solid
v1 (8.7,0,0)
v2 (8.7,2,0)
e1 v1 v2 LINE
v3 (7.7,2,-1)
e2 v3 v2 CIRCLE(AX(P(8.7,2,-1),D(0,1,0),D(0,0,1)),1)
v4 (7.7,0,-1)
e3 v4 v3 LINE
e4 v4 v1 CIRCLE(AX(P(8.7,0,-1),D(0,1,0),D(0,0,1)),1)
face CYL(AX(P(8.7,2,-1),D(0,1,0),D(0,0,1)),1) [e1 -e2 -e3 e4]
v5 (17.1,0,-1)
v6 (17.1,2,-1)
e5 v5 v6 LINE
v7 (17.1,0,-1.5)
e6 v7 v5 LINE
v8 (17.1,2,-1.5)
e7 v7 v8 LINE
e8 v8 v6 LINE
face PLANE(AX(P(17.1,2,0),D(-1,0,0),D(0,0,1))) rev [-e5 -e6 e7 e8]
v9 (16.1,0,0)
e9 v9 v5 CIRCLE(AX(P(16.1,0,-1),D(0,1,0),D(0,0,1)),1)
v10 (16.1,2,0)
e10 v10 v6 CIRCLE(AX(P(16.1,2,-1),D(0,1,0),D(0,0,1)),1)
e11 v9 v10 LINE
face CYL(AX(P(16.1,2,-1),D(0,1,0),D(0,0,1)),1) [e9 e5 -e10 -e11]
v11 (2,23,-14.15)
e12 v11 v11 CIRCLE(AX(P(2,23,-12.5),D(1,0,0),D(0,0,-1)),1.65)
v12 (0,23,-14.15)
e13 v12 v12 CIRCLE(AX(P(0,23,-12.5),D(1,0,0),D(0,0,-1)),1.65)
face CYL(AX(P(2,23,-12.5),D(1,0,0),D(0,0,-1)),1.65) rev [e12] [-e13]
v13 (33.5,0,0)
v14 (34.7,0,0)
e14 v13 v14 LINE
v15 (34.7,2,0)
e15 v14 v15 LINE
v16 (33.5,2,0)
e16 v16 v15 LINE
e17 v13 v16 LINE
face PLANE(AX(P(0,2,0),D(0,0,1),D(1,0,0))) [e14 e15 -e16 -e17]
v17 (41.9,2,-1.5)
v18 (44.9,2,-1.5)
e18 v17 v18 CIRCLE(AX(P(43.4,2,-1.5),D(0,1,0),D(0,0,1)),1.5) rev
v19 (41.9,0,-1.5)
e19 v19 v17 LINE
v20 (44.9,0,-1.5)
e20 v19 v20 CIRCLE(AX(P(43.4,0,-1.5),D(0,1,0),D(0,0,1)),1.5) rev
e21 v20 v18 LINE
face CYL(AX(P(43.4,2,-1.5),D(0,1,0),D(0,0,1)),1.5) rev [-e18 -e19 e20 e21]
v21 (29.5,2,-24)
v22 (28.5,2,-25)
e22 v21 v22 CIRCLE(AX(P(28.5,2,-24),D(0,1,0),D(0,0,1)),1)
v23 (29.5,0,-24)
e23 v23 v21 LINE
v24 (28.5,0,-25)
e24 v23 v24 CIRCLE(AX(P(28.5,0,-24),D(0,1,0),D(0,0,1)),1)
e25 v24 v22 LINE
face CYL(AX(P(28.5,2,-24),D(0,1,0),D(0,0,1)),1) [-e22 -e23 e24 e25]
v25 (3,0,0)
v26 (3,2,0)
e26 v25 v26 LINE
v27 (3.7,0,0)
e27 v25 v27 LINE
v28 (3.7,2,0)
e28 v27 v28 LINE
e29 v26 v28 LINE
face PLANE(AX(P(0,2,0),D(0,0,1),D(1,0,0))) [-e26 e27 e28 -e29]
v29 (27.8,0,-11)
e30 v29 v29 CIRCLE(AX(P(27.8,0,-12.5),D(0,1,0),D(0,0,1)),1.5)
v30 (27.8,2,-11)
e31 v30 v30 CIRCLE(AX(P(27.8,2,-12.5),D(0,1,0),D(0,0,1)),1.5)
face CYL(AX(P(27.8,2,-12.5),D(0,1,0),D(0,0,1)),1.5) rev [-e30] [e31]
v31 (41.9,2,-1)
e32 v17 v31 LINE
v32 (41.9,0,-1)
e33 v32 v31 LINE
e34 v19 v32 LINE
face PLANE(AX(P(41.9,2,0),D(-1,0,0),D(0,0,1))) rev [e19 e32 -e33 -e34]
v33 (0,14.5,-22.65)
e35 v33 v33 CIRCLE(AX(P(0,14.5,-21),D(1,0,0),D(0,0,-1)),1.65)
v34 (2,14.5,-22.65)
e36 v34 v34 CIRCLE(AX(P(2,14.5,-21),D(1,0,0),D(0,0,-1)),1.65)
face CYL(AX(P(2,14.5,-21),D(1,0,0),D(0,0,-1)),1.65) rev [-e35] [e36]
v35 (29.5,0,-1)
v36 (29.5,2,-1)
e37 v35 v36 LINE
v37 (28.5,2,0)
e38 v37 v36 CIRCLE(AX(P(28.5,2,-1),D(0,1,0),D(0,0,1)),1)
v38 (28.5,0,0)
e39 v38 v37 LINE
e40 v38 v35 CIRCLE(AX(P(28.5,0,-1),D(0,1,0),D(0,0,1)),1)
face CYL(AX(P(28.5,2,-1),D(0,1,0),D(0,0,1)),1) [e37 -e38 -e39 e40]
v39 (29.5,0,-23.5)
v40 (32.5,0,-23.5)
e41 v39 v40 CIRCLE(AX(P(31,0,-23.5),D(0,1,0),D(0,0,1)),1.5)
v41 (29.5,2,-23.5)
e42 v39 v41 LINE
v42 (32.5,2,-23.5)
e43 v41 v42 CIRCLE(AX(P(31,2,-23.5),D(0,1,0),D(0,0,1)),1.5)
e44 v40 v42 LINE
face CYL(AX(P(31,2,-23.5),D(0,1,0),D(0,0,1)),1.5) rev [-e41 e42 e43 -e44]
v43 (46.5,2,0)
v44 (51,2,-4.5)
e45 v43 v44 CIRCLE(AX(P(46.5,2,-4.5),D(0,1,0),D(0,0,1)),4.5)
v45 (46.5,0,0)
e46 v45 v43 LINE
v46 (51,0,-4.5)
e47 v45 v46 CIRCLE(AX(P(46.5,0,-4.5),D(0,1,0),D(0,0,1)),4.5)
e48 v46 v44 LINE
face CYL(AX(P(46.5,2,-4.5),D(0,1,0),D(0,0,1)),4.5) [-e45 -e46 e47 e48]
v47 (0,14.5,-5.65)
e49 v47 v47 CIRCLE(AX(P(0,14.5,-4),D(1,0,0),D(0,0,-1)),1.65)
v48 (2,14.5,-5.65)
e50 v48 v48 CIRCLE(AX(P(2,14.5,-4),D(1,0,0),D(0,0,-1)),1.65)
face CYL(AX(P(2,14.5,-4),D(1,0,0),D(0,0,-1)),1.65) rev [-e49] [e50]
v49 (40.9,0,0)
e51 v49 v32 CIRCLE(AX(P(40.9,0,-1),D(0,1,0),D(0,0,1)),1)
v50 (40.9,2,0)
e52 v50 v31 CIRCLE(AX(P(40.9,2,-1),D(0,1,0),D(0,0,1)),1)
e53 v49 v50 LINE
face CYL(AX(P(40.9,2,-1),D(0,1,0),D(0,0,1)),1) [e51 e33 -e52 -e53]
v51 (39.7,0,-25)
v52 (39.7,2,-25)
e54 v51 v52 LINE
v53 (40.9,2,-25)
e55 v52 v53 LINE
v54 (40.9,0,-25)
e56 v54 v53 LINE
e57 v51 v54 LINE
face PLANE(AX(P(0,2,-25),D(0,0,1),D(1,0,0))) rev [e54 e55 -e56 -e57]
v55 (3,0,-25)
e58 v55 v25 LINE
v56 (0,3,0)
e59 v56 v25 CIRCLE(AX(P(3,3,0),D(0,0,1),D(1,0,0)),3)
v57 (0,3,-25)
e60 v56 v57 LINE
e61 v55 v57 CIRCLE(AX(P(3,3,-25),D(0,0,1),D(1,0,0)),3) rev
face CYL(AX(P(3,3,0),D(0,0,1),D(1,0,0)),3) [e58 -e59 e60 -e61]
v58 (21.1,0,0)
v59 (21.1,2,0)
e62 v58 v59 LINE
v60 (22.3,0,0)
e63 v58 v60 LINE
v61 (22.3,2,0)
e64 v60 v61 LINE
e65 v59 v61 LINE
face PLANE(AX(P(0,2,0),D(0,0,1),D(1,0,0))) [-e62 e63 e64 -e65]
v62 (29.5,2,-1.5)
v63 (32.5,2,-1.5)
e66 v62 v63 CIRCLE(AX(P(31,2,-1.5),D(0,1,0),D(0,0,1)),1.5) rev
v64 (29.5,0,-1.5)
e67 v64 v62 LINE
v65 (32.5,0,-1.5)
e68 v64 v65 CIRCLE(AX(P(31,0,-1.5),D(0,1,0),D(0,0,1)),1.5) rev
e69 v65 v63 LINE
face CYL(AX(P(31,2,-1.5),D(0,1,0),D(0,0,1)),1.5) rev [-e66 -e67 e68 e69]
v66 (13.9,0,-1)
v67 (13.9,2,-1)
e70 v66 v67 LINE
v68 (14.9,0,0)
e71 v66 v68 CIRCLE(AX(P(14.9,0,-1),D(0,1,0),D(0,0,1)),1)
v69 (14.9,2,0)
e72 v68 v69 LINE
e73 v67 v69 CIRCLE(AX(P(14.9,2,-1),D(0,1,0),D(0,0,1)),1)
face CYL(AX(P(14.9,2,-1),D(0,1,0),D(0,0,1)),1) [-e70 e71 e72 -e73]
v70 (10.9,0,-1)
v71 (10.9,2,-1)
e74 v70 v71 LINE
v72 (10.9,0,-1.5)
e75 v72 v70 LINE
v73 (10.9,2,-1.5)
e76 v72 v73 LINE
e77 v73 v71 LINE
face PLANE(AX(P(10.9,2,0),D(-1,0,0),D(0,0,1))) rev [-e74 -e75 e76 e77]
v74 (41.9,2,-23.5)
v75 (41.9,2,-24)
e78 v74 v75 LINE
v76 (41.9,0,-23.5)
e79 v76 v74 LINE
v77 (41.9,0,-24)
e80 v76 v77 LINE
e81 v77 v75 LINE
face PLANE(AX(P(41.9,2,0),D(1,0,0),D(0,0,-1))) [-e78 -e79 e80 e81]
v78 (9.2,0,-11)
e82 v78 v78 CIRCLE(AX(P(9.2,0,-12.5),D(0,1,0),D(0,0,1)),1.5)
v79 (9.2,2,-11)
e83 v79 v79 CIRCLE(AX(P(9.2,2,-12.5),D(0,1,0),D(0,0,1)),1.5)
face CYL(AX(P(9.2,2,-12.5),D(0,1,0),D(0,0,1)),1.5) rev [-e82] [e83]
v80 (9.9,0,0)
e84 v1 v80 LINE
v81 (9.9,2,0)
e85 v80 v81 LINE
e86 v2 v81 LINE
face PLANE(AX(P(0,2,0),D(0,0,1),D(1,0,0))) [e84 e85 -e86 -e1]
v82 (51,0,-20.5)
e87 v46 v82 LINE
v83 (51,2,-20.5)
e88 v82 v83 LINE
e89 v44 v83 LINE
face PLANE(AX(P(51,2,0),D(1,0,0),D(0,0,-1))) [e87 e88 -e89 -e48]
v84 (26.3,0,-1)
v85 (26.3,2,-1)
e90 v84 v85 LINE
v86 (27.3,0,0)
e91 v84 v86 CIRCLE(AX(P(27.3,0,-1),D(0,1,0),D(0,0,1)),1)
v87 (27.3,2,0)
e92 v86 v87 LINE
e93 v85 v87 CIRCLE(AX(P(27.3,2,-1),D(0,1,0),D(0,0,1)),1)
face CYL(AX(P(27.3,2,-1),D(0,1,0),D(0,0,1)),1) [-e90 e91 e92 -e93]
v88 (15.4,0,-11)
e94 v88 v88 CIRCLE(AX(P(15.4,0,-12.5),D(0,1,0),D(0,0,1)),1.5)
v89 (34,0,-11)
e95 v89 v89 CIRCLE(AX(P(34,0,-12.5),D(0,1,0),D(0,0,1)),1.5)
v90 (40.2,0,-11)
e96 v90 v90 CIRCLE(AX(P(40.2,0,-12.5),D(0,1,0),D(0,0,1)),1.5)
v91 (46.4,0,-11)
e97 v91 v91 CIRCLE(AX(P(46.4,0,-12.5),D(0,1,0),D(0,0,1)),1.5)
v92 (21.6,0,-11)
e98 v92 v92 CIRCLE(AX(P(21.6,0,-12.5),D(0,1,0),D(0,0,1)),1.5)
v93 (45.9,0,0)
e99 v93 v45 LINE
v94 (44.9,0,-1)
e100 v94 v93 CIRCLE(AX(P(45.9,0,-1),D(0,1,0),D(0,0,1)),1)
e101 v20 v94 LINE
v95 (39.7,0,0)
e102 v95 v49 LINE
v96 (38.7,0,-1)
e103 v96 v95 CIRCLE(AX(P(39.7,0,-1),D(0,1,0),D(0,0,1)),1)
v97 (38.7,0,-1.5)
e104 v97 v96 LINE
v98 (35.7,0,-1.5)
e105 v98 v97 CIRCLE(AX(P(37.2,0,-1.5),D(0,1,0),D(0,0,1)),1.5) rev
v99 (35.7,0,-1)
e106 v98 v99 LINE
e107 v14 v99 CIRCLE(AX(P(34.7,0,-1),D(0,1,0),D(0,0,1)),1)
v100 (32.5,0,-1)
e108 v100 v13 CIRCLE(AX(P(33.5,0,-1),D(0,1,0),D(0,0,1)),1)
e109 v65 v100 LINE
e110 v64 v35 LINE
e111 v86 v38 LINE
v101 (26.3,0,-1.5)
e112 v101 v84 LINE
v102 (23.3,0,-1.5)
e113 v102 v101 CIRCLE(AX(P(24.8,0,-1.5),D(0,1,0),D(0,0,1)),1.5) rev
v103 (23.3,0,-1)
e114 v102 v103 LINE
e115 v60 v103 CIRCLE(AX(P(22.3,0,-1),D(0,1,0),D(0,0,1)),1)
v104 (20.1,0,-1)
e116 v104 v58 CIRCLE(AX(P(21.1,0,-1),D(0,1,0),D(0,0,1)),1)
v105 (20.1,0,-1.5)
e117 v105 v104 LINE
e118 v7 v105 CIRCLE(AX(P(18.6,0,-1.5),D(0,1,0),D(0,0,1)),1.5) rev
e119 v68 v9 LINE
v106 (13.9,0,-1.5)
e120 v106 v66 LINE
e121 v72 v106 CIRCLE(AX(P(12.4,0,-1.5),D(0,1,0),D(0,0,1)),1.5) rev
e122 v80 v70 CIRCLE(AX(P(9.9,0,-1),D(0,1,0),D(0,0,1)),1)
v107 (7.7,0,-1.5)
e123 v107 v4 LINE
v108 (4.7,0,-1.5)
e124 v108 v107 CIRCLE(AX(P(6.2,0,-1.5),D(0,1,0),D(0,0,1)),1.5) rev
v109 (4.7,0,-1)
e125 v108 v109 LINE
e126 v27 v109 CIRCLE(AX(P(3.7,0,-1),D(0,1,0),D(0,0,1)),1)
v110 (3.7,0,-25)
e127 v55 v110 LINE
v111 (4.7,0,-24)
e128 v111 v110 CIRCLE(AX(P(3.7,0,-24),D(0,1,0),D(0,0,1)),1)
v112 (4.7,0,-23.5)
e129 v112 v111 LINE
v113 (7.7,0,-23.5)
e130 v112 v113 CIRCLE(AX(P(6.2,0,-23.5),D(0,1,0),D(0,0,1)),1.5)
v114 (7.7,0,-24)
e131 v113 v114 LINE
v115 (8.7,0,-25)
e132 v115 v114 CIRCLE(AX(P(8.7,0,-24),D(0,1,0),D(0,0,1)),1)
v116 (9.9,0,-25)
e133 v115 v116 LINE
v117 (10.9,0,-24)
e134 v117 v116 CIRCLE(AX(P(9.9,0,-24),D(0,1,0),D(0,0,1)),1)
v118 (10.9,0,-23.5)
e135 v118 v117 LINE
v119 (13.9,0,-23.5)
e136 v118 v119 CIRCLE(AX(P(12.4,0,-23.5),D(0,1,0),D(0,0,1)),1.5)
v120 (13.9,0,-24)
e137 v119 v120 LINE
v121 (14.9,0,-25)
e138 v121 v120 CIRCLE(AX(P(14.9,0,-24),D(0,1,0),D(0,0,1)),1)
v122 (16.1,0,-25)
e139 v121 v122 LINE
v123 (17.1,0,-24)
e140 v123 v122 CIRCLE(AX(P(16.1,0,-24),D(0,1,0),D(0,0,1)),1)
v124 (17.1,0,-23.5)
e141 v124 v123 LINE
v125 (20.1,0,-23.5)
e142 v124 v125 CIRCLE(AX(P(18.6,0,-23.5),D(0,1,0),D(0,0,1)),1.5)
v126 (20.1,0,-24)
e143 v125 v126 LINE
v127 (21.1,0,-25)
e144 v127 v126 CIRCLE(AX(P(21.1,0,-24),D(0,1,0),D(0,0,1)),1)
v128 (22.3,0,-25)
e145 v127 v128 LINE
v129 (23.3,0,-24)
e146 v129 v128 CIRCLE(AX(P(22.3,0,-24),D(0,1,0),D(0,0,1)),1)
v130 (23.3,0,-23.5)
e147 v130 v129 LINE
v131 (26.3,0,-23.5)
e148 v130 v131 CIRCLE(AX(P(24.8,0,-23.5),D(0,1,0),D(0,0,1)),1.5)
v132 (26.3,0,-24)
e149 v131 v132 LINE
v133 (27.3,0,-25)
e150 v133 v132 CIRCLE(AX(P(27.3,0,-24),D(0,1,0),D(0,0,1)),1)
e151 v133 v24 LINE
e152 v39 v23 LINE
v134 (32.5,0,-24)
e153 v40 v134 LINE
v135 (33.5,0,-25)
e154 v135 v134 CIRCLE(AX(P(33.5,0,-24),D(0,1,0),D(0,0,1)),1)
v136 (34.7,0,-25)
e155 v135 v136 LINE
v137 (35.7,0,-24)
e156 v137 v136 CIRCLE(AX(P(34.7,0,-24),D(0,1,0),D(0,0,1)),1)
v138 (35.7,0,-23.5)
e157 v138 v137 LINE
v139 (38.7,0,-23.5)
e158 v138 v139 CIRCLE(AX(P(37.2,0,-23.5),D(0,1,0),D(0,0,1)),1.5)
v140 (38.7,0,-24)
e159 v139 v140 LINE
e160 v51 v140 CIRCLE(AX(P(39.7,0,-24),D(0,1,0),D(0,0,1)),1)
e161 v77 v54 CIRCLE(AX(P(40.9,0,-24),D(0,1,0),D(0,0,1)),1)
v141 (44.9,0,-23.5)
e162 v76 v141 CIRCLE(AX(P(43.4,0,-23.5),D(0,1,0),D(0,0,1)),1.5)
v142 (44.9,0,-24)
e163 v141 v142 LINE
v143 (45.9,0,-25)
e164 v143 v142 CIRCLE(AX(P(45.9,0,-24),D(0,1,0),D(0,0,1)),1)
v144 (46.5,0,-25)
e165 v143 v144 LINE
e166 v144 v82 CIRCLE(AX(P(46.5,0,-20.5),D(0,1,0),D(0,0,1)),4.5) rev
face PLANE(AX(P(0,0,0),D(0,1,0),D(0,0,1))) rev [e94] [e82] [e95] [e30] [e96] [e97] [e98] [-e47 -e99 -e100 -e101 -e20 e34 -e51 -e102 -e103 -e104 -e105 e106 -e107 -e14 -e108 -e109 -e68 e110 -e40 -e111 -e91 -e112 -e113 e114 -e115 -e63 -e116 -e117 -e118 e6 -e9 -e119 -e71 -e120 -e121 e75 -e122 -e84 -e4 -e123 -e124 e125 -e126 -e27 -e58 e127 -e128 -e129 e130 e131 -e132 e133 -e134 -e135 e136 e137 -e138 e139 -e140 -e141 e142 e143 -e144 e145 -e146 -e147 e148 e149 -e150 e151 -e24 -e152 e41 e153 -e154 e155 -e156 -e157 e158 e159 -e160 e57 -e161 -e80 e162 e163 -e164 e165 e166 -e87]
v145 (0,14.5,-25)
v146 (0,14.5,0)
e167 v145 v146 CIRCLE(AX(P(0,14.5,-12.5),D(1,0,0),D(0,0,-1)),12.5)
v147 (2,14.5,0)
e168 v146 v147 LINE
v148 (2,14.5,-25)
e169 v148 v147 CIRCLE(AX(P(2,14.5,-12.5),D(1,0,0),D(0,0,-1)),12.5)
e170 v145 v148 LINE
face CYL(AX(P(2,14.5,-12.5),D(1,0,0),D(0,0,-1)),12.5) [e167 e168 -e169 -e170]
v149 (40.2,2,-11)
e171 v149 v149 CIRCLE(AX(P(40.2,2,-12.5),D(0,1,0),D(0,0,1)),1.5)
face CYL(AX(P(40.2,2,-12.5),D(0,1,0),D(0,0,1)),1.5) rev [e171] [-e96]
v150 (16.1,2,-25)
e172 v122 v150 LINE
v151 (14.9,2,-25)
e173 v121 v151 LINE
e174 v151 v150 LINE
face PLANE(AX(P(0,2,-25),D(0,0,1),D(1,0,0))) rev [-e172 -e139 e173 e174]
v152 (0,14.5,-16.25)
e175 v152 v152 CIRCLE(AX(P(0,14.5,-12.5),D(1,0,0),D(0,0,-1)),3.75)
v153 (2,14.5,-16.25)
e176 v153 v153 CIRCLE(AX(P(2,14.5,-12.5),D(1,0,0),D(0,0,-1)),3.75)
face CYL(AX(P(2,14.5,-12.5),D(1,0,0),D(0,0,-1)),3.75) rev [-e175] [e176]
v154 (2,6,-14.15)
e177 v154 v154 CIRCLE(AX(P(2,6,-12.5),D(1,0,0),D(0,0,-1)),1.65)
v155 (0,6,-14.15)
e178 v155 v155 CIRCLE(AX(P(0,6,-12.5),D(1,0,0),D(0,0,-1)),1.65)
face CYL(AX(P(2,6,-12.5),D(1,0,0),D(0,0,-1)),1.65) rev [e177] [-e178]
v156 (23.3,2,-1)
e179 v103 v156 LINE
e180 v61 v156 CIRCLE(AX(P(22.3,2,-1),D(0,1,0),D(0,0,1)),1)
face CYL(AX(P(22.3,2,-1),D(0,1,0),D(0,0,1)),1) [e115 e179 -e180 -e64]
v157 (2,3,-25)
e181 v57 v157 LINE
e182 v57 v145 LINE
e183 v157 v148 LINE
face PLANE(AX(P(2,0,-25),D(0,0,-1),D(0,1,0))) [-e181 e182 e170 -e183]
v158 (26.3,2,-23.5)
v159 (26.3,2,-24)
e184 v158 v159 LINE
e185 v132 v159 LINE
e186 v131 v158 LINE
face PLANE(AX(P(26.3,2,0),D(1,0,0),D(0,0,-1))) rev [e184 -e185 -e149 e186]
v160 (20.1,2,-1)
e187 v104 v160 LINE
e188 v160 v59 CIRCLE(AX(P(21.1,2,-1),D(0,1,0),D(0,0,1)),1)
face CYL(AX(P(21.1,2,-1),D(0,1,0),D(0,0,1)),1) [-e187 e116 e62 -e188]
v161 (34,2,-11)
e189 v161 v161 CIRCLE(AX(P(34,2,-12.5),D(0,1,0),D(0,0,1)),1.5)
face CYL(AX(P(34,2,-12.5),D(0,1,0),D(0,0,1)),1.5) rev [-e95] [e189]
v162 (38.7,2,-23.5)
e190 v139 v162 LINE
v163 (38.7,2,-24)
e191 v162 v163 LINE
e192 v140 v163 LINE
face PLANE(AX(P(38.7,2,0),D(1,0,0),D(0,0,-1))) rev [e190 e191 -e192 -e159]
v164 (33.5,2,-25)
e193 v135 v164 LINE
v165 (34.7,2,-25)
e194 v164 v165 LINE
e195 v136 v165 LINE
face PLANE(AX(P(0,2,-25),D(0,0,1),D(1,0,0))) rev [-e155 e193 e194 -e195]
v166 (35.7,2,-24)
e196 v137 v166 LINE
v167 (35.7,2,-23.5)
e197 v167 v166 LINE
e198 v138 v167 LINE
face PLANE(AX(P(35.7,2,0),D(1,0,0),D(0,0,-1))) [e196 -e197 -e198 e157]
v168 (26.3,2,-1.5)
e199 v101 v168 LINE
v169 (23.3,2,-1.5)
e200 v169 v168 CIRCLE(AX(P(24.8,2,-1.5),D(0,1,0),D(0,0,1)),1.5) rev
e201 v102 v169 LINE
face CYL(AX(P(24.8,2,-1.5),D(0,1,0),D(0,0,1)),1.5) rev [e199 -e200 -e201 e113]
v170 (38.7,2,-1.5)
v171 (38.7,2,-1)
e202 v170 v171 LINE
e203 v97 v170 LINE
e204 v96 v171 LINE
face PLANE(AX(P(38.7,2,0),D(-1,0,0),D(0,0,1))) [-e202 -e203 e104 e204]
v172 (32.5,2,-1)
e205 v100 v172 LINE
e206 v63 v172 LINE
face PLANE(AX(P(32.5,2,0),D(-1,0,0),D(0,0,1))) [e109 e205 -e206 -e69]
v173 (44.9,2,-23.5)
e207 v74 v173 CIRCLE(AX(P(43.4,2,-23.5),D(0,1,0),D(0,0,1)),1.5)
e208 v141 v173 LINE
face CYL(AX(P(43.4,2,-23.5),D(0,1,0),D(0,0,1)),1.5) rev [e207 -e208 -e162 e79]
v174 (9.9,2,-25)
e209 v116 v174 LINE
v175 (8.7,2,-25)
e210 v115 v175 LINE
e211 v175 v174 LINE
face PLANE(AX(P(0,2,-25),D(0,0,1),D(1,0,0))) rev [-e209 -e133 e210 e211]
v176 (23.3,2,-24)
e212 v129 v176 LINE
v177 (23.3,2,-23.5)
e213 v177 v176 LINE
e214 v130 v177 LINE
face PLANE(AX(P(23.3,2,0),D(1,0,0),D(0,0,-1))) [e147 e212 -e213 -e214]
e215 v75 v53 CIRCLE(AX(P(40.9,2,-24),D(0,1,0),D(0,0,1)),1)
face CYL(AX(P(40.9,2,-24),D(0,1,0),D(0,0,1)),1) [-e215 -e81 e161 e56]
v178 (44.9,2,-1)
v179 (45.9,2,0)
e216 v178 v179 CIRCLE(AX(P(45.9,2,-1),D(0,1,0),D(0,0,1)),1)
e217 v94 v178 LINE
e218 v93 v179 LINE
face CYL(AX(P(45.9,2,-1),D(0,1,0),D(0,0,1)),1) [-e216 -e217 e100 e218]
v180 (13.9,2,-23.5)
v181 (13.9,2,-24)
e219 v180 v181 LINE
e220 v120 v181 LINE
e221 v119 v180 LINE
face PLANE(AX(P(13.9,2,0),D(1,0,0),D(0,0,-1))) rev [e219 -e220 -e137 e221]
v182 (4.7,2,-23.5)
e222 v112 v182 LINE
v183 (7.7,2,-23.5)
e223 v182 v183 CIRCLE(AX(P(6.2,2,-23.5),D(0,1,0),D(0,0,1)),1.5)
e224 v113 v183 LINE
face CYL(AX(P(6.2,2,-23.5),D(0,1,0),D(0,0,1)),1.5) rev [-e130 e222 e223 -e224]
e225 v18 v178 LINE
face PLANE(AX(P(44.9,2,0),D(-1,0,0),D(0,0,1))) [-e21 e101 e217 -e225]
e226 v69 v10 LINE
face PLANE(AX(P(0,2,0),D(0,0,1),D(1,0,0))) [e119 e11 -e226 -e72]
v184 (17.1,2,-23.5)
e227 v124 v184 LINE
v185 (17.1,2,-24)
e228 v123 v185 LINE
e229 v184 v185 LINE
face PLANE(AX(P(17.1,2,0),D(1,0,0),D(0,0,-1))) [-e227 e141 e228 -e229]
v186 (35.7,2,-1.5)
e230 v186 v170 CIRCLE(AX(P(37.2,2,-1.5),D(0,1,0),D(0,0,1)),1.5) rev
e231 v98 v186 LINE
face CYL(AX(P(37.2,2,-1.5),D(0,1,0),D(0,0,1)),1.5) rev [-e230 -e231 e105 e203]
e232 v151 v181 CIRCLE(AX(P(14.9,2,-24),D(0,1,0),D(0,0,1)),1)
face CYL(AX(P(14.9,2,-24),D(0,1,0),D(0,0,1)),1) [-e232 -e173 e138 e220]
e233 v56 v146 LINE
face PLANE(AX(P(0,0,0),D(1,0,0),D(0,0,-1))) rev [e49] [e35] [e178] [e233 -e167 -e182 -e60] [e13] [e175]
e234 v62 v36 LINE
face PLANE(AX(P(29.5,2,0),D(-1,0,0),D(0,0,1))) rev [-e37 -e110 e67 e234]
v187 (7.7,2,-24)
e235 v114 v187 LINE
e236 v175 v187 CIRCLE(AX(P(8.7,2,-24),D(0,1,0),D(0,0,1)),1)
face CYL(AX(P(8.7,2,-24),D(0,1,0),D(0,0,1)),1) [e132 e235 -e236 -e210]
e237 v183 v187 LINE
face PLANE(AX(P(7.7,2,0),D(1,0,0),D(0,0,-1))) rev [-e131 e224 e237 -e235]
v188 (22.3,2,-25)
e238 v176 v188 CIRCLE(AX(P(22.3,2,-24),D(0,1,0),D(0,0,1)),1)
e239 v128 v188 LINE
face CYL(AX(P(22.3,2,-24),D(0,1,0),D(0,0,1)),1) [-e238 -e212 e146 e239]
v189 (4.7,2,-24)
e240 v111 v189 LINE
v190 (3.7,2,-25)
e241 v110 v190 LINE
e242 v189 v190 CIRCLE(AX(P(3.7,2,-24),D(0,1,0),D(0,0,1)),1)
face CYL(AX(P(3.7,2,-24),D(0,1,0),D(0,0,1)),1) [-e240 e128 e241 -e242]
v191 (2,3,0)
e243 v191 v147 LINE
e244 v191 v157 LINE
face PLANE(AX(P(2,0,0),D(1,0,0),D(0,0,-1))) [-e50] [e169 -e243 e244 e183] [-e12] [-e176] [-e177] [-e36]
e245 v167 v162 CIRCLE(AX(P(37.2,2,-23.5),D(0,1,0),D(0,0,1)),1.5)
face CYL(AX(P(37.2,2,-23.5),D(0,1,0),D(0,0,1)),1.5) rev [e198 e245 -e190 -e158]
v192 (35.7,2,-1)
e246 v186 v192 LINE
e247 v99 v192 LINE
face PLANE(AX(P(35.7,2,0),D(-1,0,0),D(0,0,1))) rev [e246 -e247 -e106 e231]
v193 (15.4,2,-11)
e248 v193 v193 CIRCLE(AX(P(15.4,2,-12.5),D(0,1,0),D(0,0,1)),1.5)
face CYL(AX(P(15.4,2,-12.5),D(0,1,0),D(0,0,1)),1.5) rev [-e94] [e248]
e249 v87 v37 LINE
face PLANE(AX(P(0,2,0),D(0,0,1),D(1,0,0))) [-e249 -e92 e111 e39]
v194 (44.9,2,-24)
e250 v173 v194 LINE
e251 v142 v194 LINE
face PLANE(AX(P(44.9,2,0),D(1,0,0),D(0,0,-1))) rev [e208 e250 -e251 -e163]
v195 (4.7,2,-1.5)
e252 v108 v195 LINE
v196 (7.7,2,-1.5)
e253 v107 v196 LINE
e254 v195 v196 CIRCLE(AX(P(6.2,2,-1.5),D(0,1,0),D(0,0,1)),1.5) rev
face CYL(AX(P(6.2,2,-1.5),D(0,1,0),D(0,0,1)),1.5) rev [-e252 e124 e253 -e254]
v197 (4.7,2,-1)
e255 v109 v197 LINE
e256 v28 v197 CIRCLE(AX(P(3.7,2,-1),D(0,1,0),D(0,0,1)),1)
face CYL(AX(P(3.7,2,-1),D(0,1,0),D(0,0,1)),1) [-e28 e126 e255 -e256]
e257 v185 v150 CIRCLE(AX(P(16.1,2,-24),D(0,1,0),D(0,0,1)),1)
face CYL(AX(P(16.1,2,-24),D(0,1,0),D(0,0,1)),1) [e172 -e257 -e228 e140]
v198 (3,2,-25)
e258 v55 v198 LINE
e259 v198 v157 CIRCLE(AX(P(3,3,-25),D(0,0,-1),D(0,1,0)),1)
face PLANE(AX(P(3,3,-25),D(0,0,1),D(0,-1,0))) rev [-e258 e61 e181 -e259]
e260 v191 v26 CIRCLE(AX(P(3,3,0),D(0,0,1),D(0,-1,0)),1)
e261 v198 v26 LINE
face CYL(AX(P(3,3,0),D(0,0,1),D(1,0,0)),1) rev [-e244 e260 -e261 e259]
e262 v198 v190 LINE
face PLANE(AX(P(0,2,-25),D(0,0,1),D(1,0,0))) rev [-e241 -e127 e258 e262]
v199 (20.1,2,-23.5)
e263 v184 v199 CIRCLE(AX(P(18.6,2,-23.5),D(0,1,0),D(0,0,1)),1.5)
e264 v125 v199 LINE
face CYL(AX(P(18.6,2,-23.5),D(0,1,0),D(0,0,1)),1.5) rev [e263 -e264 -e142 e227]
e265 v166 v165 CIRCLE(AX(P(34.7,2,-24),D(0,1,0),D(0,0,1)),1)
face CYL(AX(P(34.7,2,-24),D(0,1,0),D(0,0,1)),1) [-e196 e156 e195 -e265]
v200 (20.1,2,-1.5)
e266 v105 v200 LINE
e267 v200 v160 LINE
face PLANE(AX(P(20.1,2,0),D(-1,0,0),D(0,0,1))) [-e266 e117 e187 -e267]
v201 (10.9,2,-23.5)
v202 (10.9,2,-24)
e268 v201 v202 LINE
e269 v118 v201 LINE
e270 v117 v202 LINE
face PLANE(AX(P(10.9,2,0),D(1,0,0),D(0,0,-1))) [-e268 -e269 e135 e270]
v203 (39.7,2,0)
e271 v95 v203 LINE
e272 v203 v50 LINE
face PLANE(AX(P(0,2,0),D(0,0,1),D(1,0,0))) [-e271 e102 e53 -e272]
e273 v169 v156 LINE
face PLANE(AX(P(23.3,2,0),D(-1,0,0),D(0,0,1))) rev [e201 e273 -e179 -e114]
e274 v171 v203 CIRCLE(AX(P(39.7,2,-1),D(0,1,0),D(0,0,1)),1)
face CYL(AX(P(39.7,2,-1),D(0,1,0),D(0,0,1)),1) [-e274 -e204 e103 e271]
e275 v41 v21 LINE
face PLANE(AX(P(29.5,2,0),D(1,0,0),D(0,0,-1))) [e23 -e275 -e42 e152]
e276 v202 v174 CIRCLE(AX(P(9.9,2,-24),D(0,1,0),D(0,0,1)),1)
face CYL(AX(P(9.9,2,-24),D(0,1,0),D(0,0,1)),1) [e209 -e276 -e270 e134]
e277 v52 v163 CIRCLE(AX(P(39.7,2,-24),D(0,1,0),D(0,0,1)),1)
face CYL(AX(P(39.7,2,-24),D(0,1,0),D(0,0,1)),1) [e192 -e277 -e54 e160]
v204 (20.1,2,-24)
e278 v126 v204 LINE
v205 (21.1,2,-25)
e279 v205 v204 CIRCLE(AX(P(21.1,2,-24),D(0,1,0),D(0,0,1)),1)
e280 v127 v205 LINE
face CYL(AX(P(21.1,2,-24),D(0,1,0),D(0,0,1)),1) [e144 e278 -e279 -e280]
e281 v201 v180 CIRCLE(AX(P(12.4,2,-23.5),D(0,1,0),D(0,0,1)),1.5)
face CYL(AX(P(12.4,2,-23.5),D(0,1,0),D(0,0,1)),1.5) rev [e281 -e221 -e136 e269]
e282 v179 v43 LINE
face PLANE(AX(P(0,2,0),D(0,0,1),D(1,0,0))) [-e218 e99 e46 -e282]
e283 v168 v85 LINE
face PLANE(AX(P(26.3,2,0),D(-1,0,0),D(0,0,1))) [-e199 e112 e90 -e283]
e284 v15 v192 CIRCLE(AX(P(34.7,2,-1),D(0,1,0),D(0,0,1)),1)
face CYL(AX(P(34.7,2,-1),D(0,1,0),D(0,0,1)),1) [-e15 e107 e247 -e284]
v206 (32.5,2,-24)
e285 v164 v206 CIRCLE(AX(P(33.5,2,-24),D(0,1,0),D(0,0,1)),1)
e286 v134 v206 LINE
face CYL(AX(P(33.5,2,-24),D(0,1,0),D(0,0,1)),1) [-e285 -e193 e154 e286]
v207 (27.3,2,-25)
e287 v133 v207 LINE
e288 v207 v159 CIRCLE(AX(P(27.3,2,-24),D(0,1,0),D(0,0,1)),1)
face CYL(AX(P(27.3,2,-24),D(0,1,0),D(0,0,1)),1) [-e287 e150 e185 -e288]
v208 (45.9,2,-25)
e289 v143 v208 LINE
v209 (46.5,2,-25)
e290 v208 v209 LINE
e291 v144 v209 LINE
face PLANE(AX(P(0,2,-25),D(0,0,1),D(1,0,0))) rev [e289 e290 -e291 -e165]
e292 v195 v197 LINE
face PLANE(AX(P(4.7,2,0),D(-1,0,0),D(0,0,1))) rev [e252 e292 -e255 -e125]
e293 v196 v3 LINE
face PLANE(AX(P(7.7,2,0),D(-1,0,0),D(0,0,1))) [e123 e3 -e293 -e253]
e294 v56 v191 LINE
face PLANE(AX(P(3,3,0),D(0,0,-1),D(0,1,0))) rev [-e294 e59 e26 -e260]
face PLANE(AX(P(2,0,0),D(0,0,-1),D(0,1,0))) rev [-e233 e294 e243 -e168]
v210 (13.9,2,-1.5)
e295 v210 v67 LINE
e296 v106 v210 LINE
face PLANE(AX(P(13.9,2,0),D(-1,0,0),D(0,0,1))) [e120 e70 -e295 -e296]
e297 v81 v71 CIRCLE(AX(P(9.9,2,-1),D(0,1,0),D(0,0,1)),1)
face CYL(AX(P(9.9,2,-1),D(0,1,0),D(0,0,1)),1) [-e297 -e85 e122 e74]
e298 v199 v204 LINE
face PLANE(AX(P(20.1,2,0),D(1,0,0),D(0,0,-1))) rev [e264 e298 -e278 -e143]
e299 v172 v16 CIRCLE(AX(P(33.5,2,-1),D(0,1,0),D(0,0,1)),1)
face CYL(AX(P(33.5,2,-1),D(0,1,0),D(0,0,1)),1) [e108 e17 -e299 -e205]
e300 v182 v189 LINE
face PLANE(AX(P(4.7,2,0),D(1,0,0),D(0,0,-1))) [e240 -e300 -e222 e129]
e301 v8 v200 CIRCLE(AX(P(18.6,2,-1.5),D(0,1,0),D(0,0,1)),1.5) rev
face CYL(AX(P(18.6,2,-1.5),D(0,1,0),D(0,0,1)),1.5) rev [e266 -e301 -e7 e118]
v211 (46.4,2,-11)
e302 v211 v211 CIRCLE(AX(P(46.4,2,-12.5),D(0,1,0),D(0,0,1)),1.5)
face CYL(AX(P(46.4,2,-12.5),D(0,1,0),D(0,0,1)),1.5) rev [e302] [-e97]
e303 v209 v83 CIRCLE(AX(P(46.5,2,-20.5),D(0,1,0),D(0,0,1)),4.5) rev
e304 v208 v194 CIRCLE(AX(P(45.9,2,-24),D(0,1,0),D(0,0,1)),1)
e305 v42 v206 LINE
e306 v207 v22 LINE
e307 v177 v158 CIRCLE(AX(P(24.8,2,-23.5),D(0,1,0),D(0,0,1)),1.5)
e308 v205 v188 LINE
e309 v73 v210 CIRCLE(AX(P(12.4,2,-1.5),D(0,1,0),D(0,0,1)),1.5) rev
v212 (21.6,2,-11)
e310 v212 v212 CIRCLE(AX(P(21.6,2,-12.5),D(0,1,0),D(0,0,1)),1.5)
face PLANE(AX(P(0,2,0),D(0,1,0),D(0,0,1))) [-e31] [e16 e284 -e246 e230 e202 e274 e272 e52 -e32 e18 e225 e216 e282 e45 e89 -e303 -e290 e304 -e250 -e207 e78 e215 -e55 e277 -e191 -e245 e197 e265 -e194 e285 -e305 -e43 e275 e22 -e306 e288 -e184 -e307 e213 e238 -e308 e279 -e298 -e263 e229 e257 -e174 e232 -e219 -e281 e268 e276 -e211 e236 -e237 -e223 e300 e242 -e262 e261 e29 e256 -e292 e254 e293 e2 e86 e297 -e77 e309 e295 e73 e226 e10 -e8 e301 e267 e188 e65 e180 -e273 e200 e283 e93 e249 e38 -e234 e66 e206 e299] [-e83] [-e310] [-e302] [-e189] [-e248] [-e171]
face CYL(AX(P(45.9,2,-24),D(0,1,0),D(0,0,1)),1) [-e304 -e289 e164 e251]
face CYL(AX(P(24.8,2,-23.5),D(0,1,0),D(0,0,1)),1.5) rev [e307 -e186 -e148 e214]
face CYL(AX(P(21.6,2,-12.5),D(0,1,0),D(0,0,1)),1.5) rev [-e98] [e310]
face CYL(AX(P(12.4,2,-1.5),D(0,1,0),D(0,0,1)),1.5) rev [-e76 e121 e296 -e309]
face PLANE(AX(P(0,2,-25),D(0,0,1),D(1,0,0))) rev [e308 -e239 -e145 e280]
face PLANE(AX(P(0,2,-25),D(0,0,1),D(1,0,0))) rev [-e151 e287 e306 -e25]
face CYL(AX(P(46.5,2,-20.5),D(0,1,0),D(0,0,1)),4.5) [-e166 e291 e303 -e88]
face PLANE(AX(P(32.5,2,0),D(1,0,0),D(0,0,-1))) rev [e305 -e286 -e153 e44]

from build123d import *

# Parameters (mm, degrees)
BOSS_EXTRUDE1_DEPTH    = 2
FILLET1_R              = 1
SKETCH2_R              = 1.65
BOSS_EXTRUDE2_DEPTH    = 2
CONVERT_SOLID1_START   = -25
CONVERT_SOLID1_DEPTH   = 25
CONVERT_SOLID1_2_DEPTH = 25


# Read off the part's stored shape, not the designer's step: Convert-Solid1
with BuildPart() as part:
    # Sketch1 → Boss-Extrude1 (new body)
    with BuildSketch(Plane(origin=(0, 0, 0), x_dir=(1, 0, 0), z_dir=(0, 1, 0))):
        with BuildLine():
            Line((51, 12.5), (47.9, 12.5))
            ThreePointArc((47.9, 12.5), (46.4, 11), (44.9, 12.5))
            Line((44.9, 12.5), (41.7, 12.5))
            ThreePointArc((41.7, 12.5), (40.2, 11), (38.7, 12.5))
            Line((38.7, 12.5), (35.5, 12.5))
            ThreePointArc((35.5, 12.5), (34, 11), (32.5, 12.5))
            Line((32.5, 12.5), (29.3, 12.5))
            ThreePointArc((29.3, 12.5), (27.8, 11), (26.3, 12.5))
            Line((26.3, 12.5), (23.1, 12.5))
            ThreePointArc((23.1, 12.5), (21.6, 11), (20.1, 12.5))
            Line((20.1, 12.5), (16.9, 12.5))
            ThreePointArc((16.9, 12.5), (15.4, 11), (13.9, 12.5))
            Line((13.9, 12.5), (10.7, 12.5))
            ThreePointArc((10.7, 12.5), (9.2, 11), (7.7, 12.5))
            Line((7.7, 12.5), (0, 12.5))
            Line((0, 12.5), (0, 0))
            Line((0, 0), (4.7, 0))
            Line((4.7, 0), (4.7, 1.5))
            ThreePointArc((4.7, 1.5), (6.2, 3), (7.7, 1.5))
            Line((7.7, 1.5), (7.7, 0))
            Line((7.7, 0), (10.9, 0))
            Line((10.9, 0), (10.9, 1.5))
            ThreePointArc((10.9, 1.5), (12.4, 3), (13.9, 1.5))
            Line((13.9, 1.5), (13.9, 0))
            Line((13.9, 0), (17.1, 0))
            Line((17.1, 0), (17.1, 1.5))
            ThreePointArc((17.1, 1.5), (18.6, 3), (20.1, 1.5))
            Line((20.1, 1.5), (20.1, 0))
            Line((20.1, 0), (23.3, 0))
            Line((23.3, 0), (23.3, 1.5))
            ThreePointArc((23.3, 1.5), (24.8, 3), (26.3, 1.5))
            Line((26.3, 1.5), (26.3, 0))
            Line((26.3, 0), (29.5, 0))
            Line((29.5, 0), (29.5, 1.5))
            ThreePointArc((29.5, 1.5), (31, 3), (32.5, 1.5))
            Line((32.5, 1.5), (32.5, 0))
            Line((32.5, 0), (35.7, 0))
            Line((35.7, 0), (35.7, 1.5))
            ThreePointArc((35.7, 1.5), (37.2, 3), (38.7, 1.5))
            Line((38.7, 1.5), (38.7, 0))
            Line((38.7, 0), (41.9, 0))
            Line((41.9, 0), (41.9, 1.5))
            ThreePointArc((41.9, 1.5), (43.4, 3), (44.9, 1.5))
            Line((44.9, 1.5), (44.9, 0))
            Line((44.9, 0), (46.5, 0))
            ThreePointArc((46.5, 0), (49.681980515, 1.318019485), (51, 4.5))
            Line((51, 4.5), (51, 12.5))
        make_face()
        with BuildLine():
            ThreePointArc((44.9, 12.5), (46.4, 14), (47.9, 12.5))
            Line((47.9, 12.5), (51, 12.5))
            Line((51, 12.5), (51, 20.5))
            ThreePointArc((51, 20.5), (49.681980515, 23.681980515), (46.5, 25))
            Line((46.5, 25), (44.9, 25))
            Line((44.9, 25), (44.9, 23.5))
            ThreePointArc((44.9, 23.5), (43.4, 22), (41.9, 23.5))
            Line((41.9, 23.5), (41.9, 25))
            Line((41.9, 25), (38.7, 25))
            Line((38.7, 25), (38.7, 23.5))
            ThreePointArc((38.7, 23.5), (37.2, 22), (35.7, 23.5))
            Line((35.7, 23.5), (35.7, 25))
            Line((35.7, 25), (32.5, 25))
            Line((32.5, 25), (32.5, 23.5))
            ThreePointArc((32.5, 23.5), (31, 22), (29.5, 23.5))
            Line((29.5, 23.5), (29.5, 25))
            Line((29.5, 25), (26.3, 25))
            Line((26.3, 25), (26.3, 23.5))
            ThreePointArc((26.3, 23.5), (24.8, 22), (23.3, 23.5))
            Line((23.3, 23.5), (23.3, 25))
            Line((23.3, 25), (20.1, 25))
            Line((20.1, 25), (20.1, 23.5))
            ThreePointArc((20.1, 23.5), (18.6, 22), (17.1, 23.5))
            Line((17.1, 23.5), (17.1, 25))
            Line((17.1, 25), (13.9, 25))
            Line((13.9, 25), (13.9, 23.5))
            ThreePointArc((13.9, 23.5), (12.4, 22), (10.9, 23.5))
            Line((10.9, 23.5), (10.9, 25))
            Line((10.9, 25), (7.7, 25))
            Line((7.7, 25), (7.7, 23.5))
            ThreePointArc((7.7, 23.5), (6.2, 22), (4.7, 23.5))
            Line((4.7, 23.5), (4.7, 25))
            Line((4.7, 25), (0, 25))
            Line((0, 25), (0, 12.5))
            Line((0, 12.5), (7.7, 12.5))
            ThreePointArc((7.7, 12.5), (9.2, 14), (10.7, 12.5))
            Line((10.7, 12.5), (13.9, 12.5))
            ThreePointArc((13.9, 12.5), (15.4, 14), (16.9, 12.5))
            Line((16.9, 12.5), (20.1, 12.5))
            ThreePointArc((20.1, 12.5), (21.6, 14), (23.1, 12.5))
            Line((23.1, 12.5), (26.3, 12.5))
            ThreePointArc((26.3, 12.5), (27.8, 14), (29.3, 12.5))
            Line((29.3, 12.5), (32.5, 12.5))
            ThreePointArc((32.5, 12.5), (34, 14), (35.5, 12.5))
            Line((35.5, 12.5), (38.7, 12.5))
            ThreePointArc((38.7, 12.5), (40.2, 14), (41.7, 12.5))
            Line((41.7, 12.5), (44.9, 12.5))
        make_face()
    extrude(amount=BOSS_EXTRUDE1_DEPTH)

    # Fillet1
    fillet1_edges = [part.edges().sort_by_distance(p)[0] for p in [
        (44.9, 1, 0),
        (41.9, 1, 0),
        (38.7, 1, 0),
        (35.7, 1, 0),
        (32.5, 1, 0),
        (29.5, 1, 0),
        (26.3, 1, 0),
        (23.3, 1, 0),
        (20.1, 1, 0),
        (17.1, 1, 0),
        (13.9, 1, 0),
        (10.9, 1, 0),
        (7.7, 1, 0),
        (4.7, 1, 0),
        (4.7, 1, -25),
        (7.7, 1, -25),
        (10.9, 1, -25),
        (13.9, 1, -25),
        (17.1, 1, -25),
        (20.1, 1, -25),
        (23.3, 1, -25),
        (26.3, 1, -25),
        (29.5, 1, -25),
        (32.5, 1, -25),
        (35.7, 1, -25),
        (38.7, 1, -25),
        (41.9, 1, -25),
        (44.9, 1, -25),
    ]]
    fillet(fillet1_edges, radius=FILLET1_R)

    # Sketch2 → Boss-Extrude2 (add)
    # profile 1 of 3: a face of its own
    with BuildSketch(Plane(origin=(0, 0, 0), x_dir=(0, 0, -1), z_dir=(1, 0, 0))):
        with BuildLine():
            Line((0, 0), (25, 0))
            Line((25, 0), (25, 14.5))
            ThreePointArc((25, 14.5), (12.5, 2), (0, 14.5))
            Line((0, 14.5), (0, 0))
        make_face()
    # profile 2 of 3: a face of its own
    with BuildSketch(Plane(origin=(0, 0, 0), x_dir=(0, 0, -1), z_dir=(1, 0, 0))):
        with BuildLine():
            ThreePointArc((0, 14.5), (12.5, 2), (25, 14.5))
            Line((25, 14.5), (22.65, 14.5))
            ThreePointArc((22.65, 14.5), (21, 12.85), (19.35, 14.5))
            Line((19.35, 14.5), (16.25, 14.5))
            ThreePointArc((16.25, 14.5), (12.5, 10.75), (8.75, 14.5))
            Line((8.75, 14.5), (5.65, 14.5))
            ThreePointArc((5.65, 14.5), (4, 12.85), (2.35, 14.5))
            Line((2.35, 14.5), (0, 14.5))
        make_face()
        with Locations((12.5, 6)):
            Circle(SKETCH2_R, mode=Mode.SUBTRACT)
    # profile 3 of 3: a face of its own
    with BuildSketch(Plane(origin=(0, 0, 0), x_dir=(0, 0, -1), z_dir=(1, 0, 0))):
        with BuildLine():
            Line((22.65, 14.5), (25, 14.5))
            ThreePointArc((25, 14.5), (12.5, 27), (0, 14.5))
            Line((0, 14.5), (2.35, 14.5))
            ThreePointArc((2.35, 14.5), (4, 16.15), (5.65, 14.5))
            Line((5.65, 14.5), (8.75, 14.5))
            ThreePointArc((8.75, 14.5), (12.5, 18.25), (16.25, 14.5))
            Line((16.25, 14.5), (19.35, 14.5))
            ThreePointArc((19.35, 14.5), (21, 16.15), (22.65, 14.5))
        make_face()
        with Locations((12.5, 23)):
            Circle(SKETCH2_R, mode=Mode.SUBTRACT)
    extrude(amount=BOSS_EXTRUDE2_DEPTH)

    # Convert-Solid1 outline → Convert-Solid1 (cut)
    with BuildSketch(Plane.XY.offset(CONVERT_SOLID1_START)):
        with BuildLine():
            ThreePointArc((3, 0), (0.878679656, 0.878679656), (0, 3))
            Line((0, 3), (0, 0))
            Line((0, 0), (3, 0))
        make_face()
    extrude(amount=CONVERT_SOLID1_DEPTH, mode=Mode.SUBTRACT)

    # Convert-Solid1 2 outline → Convert-Solid1 2 (add)
    with BuildSketch(Plane.XY.offset(CONVERT_SOLID1_START)):
        with BuildLine():
            ThreePointArc((3, 2), (2.292893219, 2.292893219), (2, 3))
            Line((2, 3), (2, 2))
            Line((2, 2), (3, 2))
        make_face()
    extrude(amount=CONVERT_SOLID1_2_DEPTH)


solid = part.part
